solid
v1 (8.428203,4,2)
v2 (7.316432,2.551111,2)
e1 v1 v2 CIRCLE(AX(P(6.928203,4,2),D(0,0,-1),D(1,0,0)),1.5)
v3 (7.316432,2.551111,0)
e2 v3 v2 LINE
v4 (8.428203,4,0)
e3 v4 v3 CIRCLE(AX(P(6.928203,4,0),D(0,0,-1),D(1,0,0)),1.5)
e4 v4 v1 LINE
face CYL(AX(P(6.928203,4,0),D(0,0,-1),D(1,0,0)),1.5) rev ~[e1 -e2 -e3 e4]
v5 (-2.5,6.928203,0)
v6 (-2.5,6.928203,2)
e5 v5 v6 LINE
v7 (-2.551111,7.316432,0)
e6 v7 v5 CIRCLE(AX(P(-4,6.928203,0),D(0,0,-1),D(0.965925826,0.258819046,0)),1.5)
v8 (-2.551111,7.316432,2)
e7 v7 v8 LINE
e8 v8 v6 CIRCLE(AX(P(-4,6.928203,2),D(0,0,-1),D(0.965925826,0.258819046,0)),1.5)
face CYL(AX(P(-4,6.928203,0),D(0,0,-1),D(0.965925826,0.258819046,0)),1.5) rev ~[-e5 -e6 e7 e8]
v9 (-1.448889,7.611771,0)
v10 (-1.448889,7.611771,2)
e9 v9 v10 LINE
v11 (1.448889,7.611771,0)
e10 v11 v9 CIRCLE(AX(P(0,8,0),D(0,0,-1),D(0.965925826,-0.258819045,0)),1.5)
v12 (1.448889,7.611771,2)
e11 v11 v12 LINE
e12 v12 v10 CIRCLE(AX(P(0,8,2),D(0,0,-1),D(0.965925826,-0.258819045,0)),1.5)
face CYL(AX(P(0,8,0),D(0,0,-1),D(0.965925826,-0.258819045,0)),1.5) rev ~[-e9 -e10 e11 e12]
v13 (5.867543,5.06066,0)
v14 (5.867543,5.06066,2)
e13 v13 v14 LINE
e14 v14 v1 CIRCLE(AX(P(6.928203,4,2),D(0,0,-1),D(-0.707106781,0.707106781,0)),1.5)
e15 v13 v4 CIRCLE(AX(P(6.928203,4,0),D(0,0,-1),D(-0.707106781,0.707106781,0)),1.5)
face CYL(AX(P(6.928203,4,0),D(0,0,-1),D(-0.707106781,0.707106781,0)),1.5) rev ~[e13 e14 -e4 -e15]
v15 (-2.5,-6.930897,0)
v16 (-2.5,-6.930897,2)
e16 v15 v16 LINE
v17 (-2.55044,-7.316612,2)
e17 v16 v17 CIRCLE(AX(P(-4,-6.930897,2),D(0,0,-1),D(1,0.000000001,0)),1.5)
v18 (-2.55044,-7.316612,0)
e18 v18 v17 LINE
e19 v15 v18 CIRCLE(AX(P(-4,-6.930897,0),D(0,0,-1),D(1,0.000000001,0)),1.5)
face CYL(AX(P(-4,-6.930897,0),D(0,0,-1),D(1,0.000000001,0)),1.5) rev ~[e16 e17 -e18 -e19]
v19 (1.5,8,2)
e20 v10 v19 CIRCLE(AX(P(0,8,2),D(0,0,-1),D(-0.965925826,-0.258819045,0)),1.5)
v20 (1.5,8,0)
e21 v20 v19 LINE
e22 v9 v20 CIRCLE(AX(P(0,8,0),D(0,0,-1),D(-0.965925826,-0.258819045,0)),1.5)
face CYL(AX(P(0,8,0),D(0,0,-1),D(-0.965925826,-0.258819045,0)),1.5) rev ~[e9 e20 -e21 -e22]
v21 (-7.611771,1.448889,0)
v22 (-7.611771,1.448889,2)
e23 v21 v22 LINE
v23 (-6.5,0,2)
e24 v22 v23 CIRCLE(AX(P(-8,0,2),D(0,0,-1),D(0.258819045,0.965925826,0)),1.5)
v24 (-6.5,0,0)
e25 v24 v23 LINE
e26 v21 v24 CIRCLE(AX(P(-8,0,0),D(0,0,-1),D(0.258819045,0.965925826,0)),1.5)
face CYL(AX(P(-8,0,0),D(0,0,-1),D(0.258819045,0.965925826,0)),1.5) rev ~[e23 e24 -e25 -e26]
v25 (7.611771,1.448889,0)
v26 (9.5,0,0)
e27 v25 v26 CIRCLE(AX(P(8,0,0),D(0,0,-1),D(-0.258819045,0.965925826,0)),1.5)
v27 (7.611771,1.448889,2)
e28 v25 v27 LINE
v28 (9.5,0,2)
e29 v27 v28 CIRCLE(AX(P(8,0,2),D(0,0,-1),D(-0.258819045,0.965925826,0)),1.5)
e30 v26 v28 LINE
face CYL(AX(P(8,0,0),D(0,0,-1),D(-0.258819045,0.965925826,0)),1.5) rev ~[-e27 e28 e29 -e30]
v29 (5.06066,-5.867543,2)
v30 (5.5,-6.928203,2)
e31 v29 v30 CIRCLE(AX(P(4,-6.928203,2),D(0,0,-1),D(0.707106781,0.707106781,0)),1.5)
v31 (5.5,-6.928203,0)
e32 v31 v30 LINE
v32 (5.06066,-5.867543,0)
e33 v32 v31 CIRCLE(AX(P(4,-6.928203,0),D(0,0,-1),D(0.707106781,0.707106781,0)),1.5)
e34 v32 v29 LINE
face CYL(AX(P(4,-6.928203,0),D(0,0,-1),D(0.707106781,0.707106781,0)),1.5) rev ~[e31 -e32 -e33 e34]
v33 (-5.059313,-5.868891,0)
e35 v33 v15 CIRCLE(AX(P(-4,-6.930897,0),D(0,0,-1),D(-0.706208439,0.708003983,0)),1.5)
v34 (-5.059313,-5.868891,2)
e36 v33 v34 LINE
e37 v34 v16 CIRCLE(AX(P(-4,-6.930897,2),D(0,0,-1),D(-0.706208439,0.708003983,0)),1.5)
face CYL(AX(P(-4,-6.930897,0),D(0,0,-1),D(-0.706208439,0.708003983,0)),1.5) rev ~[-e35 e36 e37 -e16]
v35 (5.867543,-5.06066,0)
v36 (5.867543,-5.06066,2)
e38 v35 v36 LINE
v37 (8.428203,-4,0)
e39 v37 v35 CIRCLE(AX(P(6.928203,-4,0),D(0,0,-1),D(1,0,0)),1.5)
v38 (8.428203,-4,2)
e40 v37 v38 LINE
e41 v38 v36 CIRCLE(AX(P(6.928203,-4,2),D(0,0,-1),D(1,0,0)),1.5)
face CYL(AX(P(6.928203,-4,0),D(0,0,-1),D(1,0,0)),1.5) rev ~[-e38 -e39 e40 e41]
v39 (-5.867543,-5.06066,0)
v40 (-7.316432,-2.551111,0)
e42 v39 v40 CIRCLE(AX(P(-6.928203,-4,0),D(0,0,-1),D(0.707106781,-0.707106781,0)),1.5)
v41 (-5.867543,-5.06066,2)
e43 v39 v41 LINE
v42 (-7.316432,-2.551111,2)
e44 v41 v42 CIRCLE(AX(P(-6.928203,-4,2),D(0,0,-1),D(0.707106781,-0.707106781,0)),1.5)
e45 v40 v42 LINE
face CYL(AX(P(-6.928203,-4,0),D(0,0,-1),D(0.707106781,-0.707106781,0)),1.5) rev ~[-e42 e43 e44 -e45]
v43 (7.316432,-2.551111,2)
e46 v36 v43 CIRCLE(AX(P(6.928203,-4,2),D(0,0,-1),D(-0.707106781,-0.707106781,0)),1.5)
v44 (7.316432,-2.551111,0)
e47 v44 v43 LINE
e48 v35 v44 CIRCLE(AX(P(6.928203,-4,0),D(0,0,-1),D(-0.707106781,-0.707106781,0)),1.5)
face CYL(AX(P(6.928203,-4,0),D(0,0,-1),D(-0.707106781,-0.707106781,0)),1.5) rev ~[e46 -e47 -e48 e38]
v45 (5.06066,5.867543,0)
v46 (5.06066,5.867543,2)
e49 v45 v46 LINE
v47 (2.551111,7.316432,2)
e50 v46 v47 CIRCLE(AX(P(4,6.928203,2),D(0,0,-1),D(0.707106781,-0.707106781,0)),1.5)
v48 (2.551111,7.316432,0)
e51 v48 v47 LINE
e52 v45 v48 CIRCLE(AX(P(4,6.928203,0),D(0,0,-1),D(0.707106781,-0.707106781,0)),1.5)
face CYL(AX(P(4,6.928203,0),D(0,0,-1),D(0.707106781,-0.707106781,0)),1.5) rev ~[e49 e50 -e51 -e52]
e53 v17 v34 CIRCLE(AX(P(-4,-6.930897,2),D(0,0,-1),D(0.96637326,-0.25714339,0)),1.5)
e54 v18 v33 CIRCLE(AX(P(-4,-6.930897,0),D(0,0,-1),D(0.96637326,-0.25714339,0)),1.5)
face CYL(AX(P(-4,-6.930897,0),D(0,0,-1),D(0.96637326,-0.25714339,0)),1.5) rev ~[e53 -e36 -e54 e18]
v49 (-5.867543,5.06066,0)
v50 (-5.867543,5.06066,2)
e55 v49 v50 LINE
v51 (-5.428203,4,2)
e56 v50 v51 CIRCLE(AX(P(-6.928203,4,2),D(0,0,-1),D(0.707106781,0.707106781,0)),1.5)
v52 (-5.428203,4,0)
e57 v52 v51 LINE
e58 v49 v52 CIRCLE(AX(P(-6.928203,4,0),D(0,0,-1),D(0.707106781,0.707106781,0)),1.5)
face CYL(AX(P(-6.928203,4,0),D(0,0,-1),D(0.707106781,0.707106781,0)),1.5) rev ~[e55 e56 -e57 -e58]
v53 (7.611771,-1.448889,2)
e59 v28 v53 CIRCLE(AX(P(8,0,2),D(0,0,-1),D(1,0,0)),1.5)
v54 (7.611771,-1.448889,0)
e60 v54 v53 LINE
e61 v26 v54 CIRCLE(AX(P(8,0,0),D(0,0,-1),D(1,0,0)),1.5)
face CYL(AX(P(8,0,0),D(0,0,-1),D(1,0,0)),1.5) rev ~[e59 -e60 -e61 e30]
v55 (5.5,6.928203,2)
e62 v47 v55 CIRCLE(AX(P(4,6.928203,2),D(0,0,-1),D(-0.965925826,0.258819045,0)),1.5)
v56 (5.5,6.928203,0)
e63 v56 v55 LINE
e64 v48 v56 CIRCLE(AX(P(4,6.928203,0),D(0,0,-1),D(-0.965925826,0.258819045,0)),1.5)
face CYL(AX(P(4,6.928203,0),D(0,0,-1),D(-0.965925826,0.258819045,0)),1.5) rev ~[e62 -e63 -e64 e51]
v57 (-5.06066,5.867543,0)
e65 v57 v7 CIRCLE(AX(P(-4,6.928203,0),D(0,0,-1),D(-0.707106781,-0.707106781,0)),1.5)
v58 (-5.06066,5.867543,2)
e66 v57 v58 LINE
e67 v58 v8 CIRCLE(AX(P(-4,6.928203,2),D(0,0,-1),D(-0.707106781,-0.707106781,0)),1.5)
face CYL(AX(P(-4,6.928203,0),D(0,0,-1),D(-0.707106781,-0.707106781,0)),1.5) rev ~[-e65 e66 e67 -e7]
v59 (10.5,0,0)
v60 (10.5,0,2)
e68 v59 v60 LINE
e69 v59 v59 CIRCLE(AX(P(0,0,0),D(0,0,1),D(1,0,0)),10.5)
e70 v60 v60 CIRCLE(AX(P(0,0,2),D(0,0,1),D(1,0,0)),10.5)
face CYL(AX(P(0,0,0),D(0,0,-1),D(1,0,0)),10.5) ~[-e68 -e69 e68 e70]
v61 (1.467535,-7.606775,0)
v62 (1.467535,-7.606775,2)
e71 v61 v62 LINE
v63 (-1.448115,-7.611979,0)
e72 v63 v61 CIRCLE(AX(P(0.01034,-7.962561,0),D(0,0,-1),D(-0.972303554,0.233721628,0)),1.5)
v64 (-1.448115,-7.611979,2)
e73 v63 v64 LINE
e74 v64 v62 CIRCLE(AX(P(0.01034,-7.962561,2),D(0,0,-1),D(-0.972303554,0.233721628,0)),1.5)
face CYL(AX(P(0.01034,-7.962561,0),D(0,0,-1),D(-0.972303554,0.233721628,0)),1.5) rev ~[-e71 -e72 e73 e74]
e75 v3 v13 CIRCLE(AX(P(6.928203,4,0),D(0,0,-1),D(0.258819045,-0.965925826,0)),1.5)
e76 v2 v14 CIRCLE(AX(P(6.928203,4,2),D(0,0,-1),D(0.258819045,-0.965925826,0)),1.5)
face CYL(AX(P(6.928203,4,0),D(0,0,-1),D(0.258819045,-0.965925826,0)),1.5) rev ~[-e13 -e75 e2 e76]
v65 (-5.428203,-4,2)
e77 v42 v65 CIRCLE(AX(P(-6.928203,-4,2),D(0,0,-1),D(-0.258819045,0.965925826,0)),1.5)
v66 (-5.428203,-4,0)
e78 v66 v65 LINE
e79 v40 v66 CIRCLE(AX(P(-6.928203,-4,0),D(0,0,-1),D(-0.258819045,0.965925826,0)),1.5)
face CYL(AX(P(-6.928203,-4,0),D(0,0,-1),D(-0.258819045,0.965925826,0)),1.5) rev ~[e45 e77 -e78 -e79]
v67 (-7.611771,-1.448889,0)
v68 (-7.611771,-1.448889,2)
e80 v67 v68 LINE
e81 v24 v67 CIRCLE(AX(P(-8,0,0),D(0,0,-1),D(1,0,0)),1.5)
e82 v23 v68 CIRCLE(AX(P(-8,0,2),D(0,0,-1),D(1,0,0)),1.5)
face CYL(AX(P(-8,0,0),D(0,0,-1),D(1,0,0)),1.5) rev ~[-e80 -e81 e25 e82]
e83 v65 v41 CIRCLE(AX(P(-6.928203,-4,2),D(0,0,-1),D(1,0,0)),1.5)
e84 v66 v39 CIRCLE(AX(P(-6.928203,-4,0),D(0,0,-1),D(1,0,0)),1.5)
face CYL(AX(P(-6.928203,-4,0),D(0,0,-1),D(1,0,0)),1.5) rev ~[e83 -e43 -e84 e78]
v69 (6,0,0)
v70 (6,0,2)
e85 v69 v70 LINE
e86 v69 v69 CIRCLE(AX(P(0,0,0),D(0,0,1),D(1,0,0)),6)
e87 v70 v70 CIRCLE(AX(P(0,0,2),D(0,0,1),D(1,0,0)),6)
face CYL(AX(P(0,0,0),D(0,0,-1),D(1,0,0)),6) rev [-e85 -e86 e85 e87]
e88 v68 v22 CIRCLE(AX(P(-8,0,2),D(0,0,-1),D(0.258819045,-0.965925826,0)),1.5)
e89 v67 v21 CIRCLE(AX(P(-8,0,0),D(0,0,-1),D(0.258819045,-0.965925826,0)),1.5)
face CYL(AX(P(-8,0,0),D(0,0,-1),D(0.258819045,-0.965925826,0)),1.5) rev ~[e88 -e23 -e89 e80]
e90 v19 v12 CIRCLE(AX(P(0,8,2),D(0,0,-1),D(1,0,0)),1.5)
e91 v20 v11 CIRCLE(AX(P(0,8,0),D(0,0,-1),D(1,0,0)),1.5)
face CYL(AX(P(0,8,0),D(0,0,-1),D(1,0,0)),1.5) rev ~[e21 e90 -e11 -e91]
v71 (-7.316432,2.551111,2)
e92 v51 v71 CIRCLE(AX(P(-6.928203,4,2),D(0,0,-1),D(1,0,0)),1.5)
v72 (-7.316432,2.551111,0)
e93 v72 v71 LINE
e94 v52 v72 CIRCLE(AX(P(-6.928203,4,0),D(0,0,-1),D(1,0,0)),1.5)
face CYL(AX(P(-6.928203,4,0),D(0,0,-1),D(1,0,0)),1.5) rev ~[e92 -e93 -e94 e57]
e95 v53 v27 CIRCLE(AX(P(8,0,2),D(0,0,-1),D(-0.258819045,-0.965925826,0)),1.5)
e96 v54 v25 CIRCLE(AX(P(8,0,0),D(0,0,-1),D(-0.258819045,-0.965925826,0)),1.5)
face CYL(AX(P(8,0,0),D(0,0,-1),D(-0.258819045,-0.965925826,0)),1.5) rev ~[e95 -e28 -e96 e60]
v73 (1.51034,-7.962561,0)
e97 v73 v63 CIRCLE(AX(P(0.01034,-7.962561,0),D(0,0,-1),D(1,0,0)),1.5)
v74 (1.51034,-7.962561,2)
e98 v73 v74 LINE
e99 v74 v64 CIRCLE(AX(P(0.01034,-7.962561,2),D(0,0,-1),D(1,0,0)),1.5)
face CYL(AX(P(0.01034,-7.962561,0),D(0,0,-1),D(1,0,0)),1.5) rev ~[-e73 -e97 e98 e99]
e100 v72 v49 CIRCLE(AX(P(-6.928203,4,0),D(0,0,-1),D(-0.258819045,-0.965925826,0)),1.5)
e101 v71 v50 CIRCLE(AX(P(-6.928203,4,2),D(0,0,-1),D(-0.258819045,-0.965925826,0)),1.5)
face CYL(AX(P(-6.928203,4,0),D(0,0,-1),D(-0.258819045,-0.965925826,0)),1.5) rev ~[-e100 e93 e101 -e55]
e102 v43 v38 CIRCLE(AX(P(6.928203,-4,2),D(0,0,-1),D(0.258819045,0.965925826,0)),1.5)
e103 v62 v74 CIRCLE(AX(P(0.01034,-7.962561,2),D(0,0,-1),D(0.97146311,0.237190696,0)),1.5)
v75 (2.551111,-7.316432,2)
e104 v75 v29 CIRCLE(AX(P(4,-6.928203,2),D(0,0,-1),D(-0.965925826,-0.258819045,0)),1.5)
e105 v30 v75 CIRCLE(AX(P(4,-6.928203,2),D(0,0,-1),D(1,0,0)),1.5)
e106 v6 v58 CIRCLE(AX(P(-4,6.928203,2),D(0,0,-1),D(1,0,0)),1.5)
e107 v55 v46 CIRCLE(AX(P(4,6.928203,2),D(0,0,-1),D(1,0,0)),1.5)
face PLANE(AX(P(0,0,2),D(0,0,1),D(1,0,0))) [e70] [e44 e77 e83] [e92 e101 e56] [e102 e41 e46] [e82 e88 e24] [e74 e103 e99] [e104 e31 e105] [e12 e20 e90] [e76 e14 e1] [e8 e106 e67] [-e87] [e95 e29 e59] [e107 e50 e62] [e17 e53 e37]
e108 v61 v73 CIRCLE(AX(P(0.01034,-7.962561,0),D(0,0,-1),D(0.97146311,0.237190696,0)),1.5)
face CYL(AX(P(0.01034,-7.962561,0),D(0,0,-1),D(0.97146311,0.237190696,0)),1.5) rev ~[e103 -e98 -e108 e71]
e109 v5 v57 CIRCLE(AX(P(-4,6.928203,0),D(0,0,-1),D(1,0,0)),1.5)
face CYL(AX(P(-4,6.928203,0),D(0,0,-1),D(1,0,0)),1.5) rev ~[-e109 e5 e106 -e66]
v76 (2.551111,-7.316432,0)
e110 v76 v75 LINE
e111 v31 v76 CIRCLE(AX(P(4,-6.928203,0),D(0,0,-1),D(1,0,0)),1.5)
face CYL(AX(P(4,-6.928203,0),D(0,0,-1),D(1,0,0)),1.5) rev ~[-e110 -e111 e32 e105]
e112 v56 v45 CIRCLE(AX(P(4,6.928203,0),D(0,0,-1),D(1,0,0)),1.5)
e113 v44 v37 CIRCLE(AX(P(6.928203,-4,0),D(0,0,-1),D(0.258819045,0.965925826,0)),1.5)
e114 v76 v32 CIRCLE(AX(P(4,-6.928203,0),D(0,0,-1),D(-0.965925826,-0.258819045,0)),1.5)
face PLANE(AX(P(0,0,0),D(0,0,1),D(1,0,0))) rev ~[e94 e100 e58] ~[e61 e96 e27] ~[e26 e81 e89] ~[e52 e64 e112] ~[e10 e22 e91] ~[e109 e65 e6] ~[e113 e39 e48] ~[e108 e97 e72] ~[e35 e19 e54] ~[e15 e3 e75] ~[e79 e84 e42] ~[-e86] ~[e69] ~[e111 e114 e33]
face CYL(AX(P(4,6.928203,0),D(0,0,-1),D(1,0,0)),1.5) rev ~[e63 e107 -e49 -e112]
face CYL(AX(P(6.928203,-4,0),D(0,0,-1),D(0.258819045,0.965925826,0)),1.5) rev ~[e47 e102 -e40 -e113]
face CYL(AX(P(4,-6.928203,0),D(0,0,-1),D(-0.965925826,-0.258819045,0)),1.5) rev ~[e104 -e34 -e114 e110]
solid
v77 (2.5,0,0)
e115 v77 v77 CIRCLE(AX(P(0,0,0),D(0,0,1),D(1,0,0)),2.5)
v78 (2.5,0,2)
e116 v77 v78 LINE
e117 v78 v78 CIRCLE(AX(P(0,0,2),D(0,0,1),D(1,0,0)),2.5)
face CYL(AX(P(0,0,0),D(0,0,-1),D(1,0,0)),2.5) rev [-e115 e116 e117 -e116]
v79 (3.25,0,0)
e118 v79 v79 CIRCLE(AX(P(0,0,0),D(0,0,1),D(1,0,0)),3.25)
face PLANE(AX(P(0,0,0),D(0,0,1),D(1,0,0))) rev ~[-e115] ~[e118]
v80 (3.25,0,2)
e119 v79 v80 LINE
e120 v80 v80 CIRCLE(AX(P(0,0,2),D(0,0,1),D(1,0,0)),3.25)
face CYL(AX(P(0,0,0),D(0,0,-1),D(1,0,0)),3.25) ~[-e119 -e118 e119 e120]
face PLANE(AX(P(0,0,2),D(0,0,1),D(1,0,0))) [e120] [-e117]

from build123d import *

# Parameters (mm, degrees)
F0_R     = 10.5
F0_R_2   = 6
F1_DEPTH = 2
F0_R_3   = 3.25
F0_R_4   = 2.5


# Not quite as in the source:
# - the program builds the solid bodies; features that only make, move or delete a surface that nothing else refers to are left out


with BuildPart() as f1:
    # F0 (on Top) → F1 (new body)
    with BuildSketch(Plane.XY):
        Circle(F0_R)
        with BuildLine():
            ThreePointArc((-5.0606601718, 5.8675430585), (-4.75, 8.227241336), (-2.5511112606, 7.3164317979))
            Line((-2.5511112606, 7.3164317979), (-1.4488887394, 7.6117714323))
            ThreePointArc((-1.4488887394, 7.6117714323), (-0.1957892883, 9.4871672921), (1.5, 8))
            ThreePointArc((1.5, 8), (1.4871672921, 7.8042107117), (1.4488887394, 7.6117714323))
            Line((1.4488887394, 7.6117714323), (2.5511112606, 7.3164317979))
            ThreePointArc((2.5511112606, 7.3164317979), (4.1957892883, 8.4153705223), (5.5, 6.9282032303))
            ThreePointArc((5.5, 6.9282032303), (5.3858192988, 6.3541780817), (5.0606601718, 5.8675430585))
            Line((5.0606601718, 5.8675430585), (5.8675430585, 5.0606601718))
            ThreePointArc((5.8675430585, 5.0606601718), (7.5022283788, 5.3858192988), (8.4282032303, 4))
            ThreePointArc((8.4282032303, 4), (8.1182332407, 3.0868578565), (7.3164317979, 2.5511112606))
            Line((7.3164317979, 2.5511112606), (7.6117714323, 1.4488887394))
            ThreePointArc((7.6117714323, 1.4488887394), (8.9131421435, 1.1900300104), (9.5, 0))
            ThreePointArc((9.5, 0), (8.9131421435, -1.1900300104), (7.6117714323, -1.4488887394))
            Line((7.6117714323, -1.4488887394), (7.3164317979, -2.5511112606))
            ThreePointArc((7.3164317979, -2.5511112606), (8.1182332407, -3.0868578565), (8.4282032303, -4))
            ThreePointArc((8.4282032303, -4), (7.5022283788, -5.3858192988), (5.8675430585, -5.0606601718))
            Line((5.8675430585, -5.0606601718), (5.0606601718, -5.8675430585))
            ThreePointArc((5.0606601718, -5.8675430585), (5.3858192988, -6.3541780817), (5.5, -6.9282032303))
            ThreePointArc((5.5, -6.9282032303), (4.1957892883, -8.4153705223), (2.5511112606, -7.3164317979))
            Line((2.5511112606, -7.3164317979), (1.4675350544, -7.6067751673))
            ThreePointArc((1.4675350544, -7.6067751673), (1.4996006084, -7.7833853166), (1.51034039, -7.9625612125))
            ThreePointArc((1.51034039, -7.9625612125), (-0.16617732, -9.4521388365), (-1.4481149408, -7.6119787711))
            Line((-1.4481149408, -7.6119787711), (-2.5504401106, -7.316611632))
            ThreePointArc((-2.5504401106, -7.316611632), (-4.7496981342, -8.2301088879), (-5.0593126587, -5.8688905716))
            Line((-5.0593126587, -5.8688905716), (-5.8675430585, -5.0606601718))
            ThreePointArc((-5.8675430585, -5.0606601718), (-8.227241336, -4.75), (-7.3164317979, -2.5511112606))
            Line((-7.3164317979, -2.5511112606), (-7.6117714323, -1.4488887394))
            ThreePointArc((-7.6117714323, -1.4488887394), (-9.5, 0), (-7.6117714323, 1.4488887394))
            Line((-7.6117714323, 1.4488887394), (-7.3164317979, 2.5511112606))
            ThreePointArc((-7.3164317979, 2.5511112606), (-8.227241336, 4.75), (-5.8675430585, 5.0606601718))
            Line((-5.8675430585, 5.0606601718), (-5.0606601718, 5.8675430585))
        make_face(mode=Mode.SUBTRACT)
        with BuildLine():
            ThreePointArc((-2.5511112606, 7.3164317979), (-2.5128327079, 7.1239925186), (-2.5, 6.9282032303))
            ThreePointArc((-2.5, 6.9282032303), (-3.4259748515, 5.5423839315), (-5.0606601718, 5.8675430585))
            Line((-5.0606601718, 5.8675430585), (-5.8675430585, 5.0606601718))
            ThreePointArc((-5.8675430585, 5.0606601718), (-5.5423839315, 4.5740251485), (-5.4282032303, 4))
            ThreePointArc((-5.4282032303, 4), (-6.0150610868, 2.8099699896), (-7.3164317979, 2.5511112606))
            Line((-7.3164317979, 2.5511112606), (-7.6117714323, 1.4488887394))
            ThreePointArc((-7.6117714323, 1.4488887394), (-6.8099699896, 0.9131421435), (-6.5, 0))
            ThreePointArc((-6.5, 0), (-6.8099699896, -0.9131421435), (-7.6117714323, -1.4488887394))
            Line((-7.6117714323, -1.4488887394), (-7.3164317979, -2.5511112606))
            ThreePointArc((-7.3164317979, -2.5511112606), (-6.0150610868, -2.8099699896), (-5.4282032303, -4))
            ThreePointArc((-5.4282032303, -4), (-5.5423839315, -4.5740251485), (-5.8675430585, -5.0606601718))
            Line((-5.8675430585, -5.0606601718), (-5.0593126587, -5.8688905716))
            ThreePointArc((-5.0593126587, -5.8688905716), (-3.4250952201, -5.5454419303), (-2.5, -6.9308965467))
            ThreePointArc((-2.5, -6.9308965467), (-2.5126634822, -7.1253961173), (-2.5504401106, -7.316611632))
            Line((-2.5504401106, -7.316611632), (-1.4481149408, -7.6119787711))
            ThreePointArc((-1.4481149408, -7.6119787711), (0.007663322, -6.4625636014), (1.4675350544, -7.6067751673))
            Line((1.4675350544, -7.6067751673), (2.5511112606, -7.3164317979))
            ThreePointArc((2.5511112606, -7.3164317979), (3.25, -5.6291651246), (5.0606601718, -5.8675430585))
            Line((5.0606601718, -5.8675430585), (5.8675430585, -5.0606601718))
            ThreePointArc((5.8675430585, -5.0606601718), (5.6291651246, -3.25), (7.3164317979, -2.5511112606))
            Line((7.3164317979, -2.5511112606), (7.6117714323, -1.4488887394))
            ThreePointArc((7.6117714323, -1.4488887394), (6.5, 0), (7.6117714323, 1.4488887394))
            Line((7.6117714323, 1.4488887394), (7.3164317979, 2.5511112606))
            ThreePointArc((7.3164317979, 2.5511112606), (5.6291651246, 3.25), (5.8675430585, 5.0606601718))
            Line((5.8675430585, 5.0606601718), (5.0606601718, 5.8675430585))
            ThreePointArc((5.0606601718, 5.8675430585), (3.25, 5.6291651246), (2.5511112606, 7.3164317979))
            Line((2.5511112606, 7.3164317979), (1.4488887394, 7.6117714323))
            ThreePointArc((1.4488887394, 7.6117714323), (0, 6.5), (-1.4488887394, 7.6117714323))
            Line((-1.4488887394, 7.6117714323), (-2.5511112606, 7.3164317979))
        make_face()
        Circle(F0_R_2, mode=Mode.SUBTRACT)
    extrude(amount=F1_DEPTH)


with BuildPart() as f1b:
    # F0 (on Top) → F1, piece 2 (new body)
    with BuildSketch(Plane.XY):
        Circle(F0_R_3)
        Circle(F0_R_4, mode=Mode.SUBTRACT)
    extrude(amount=F1_DEPTH)


solid = Compound([f1.part, f1b.part])
